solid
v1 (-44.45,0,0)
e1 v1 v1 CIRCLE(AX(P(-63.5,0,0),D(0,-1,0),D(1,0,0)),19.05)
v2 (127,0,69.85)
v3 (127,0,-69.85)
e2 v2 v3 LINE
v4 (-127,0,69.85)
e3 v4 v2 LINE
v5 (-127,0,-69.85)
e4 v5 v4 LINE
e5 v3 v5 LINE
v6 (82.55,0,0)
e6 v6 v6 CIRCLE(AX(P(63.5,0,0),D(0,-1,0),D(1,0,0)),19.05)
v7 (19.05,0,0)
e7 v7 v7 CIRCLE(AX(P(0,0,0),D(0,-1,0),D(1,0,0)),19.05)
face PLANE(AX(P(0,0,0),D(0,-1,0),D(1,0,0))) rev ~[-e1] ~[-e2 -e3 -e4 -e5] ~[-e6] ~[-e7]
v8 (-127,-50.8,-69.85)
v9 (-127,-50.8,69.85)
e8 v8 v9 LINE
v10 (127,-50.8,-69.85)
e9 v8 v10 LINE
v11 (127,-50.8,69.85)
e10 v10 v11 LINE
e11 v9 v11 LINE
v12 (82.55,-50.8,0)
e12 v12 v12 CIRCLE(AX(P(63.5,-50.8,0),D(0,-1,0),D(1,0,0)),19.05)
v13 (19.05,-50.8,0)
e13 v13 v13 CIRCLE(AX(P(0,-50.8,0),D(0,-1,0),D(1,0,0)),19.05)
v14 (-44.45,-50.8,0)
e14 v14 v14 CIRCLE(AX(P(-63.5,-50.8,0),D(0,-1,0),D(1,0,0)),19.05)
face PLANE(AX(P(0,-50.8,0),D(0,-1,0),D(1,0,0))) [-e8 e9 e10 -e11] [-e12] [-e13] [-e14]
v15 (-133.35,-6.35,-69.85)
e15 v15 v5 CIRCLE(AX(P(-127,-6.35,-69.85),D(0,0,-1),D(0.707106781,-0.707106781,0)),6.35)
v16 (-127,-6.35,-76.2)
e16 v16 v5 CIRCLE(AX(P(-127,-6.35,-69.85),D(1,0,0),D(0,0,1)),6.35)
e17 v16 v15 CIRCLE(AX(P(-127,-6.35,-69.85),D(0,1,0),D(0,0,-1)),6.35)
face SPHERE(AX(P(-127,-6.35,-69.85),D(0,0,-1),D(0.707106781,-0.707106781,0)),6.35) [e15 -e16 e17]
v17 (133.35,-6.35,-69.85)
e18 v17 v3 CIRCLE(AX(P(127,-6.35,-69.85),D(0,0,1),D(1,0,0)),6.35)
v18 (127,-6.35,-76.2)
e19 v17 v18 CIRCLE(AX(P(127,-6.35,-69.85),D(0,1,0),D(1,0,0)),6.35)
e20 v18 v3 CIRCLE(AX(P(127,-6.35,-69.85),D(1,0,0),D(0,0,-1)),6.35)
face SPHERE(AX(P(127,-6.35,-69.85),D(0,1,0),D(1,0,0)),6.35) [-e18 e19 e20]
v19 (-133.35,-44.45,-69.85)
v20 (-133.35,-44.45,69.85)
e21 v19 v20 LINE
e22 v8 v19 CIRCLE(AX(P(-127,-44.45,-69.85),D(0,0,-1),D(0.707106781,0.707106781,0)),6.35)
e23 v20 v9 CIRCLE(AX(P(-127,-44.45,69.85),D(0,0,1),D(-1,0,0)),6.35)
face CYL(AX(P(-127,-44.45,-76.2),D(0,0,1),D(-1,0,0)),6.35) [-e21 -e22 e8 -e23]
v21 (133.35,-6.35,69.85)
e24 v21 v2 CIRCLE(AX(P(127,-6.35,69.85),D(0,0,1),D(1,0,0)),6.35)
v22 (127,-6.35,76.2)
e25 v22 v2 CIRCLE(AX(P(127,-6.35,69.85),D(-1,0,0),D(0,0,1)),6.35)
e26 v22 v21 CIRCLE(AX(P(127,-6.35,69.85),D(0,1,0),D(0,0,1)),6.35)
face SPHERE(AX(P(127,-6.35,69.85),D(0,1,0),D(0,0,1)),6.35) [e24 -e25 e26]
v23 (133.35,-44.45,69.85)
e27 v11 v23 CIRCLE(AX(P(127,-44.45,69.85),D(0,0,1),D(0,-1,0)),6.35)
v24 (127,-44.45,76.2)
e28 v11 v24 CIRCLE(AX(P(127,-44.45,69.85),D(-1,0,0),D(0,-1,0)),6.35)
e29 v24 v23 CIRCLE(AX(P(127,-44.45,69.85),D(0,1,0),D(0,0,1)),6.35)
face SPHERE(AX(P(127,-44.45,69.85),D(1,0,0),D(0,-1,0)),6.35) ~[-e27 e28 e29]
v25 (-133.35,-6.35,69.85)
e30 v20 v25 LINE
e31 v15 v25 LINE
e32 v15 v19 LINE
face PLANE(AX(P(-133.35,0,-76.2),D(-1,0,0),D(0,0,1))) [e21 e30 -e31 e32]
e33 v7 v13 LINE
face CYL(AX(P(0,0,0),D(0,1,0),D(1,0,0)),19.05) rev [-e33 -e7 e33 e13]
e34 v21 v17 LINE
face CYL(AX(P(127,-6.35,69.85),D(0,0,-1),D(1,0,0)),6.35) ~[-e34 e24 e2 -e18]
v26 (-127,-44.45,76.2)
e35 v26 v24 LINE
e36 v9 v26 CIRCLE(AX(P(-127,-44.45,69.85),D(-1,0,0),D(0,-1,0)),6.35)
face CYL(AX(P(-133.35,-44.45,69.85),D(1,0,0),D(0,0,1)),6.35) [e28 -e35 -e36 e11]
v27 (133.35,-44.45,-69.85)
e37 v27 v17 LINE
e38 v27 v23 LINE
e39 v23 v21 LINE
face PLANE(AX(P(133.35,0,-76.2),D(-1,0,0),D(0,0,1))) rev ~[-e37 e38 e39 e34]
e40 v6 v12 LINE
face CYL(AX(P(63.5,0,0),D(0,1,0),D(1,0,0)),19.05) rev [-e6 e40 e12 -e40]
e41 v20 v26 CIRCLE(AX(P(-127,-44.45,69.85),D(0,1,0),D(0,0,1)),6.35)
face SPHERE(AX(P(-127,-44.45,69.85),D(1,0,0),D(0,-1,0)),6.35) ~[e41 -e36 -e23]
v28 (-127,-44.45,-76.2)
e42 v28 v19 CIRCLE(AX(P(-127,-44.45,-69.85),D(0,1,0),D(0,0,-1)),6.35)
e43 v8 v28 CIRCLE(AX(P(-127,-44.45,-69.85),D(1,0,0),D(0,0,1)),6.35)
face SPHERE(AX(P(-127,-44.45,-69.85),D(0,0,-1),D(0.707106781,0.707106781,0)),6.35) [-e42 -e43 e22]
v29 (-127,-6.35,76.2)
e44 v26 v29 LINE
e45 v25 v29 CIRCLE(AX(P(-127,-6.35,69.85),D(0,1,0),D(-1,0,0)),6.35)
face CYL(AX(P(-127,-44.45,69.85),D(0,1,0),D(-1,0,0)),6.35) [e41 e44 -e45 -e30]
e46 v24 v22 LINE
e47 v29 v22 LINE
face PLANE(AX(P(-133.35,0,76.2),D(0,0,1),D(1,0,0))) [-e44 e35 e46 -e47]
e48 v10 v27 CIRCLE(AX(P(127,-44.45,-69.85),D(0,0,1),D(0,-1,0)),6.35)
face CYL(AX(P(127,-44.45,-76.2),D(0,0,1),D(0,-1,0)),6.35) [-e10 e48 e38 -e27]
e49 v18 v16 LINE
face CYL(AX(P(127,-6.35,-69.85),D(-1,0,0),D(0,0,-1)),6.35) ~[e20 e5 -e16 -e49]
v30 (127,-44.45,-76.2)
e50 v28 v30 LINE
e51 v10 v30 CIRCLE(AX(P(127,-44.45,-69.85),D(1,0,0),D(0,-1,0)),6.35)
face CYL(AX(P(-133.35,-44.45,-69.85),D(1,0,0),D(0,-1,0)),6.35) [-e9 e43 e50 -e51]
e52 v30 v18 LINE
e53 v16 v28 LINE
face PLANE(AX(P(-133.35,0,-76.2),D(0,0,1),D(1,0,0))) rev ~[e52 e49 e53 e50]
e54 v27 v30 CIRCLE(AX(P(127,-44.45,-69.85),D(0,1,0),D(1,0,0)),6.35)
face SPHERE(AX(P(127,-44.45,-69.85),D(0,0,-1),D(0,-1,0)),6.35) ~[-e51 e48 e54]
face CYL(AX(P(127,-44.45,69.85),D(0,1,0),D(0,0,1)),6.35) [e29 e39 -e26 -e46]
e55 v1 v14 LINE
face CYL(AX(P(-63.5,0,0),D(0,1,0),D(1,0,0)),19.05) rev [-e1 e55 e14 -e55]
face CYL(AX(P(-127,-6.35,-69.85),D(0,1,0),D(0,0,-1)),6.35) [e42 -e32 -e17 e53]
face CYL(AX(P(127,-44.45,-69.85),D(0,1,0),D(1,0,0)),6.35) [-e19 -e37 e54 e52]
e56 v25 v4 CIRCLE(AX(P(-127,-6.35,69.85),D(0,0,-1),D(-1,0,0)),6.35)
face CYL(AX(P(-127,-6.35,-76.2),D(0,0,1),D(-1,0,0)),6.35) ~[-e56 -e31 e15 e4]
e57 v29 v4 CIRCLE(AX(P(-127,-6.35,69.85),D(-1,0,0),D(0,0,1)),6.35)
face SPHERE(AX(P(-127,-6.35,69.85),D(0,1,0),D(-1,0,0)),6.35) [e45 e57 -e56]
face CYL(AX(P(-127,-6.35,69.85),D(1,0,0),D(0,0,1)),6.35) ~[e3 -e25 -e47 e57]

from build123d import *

# Parameters (mm, degrees)
F0_W         = 266.7
F0_H         = 152.4
F0_R         = 19.05
F1_DEPTH     = 50.8
F2_R         = 6.35
F3_R         = 6.35
F4_R         = 6.35
F5_R         = 6.35
F6_T1_DEPTH  = 38.1
F6_S5_W      = 6.35
F6_S5_H      = 6.35
F6_T6_DEPTH  = 6.35
F6_S11_W     = 6.35
F6_S11_H     = 6.35
F6_T12_DEPTH = 6.35


# Not quite as in the source:
# - a fillet or chamfer that OpenCascade refuses, or shapes differently, is made with other operations: its cross-section is extruded or revolved along the edge and cut away or added


with BuildPart() as f1:
    # F0 (on Front) → F1 (new body)
    with BuildSketch(Plane.XZ):
        Rectangle(F0_W, F0_H)
        with Locations((-63.5, 0)):
            Circle(F0_R, mode=Mode.SUBTRACT)
        Circle(F0_R, mode=Mode.SUBTRACT)
        with Locations((63.5, 0)):
            Circle(F0_R, mode=Mode.SUBTRACT)
    extrude(amount=F1_DEPTH)

    # F2
    f2_edges = [f1.edges().sort_by_distance(p)[0] for p in [
        (0, -50.8, 76.2),
    ]]
    fillet(f2_edges, radius=F2_R)

    # F3
    f3_edges = [f1.edges().sort_by_distance(p)[0] for p in [
        (133.35, -50.8, -3.175),
    ]]
    fillet(f3_edges, radius=F3_R)

    # F4
    f4_edges = [f1.edges().sort_by_distance(p)[0] for p in [
        (-3.175, -50.8, -76.2),
        (-133.35, -50.8, -3.175),
    ]]
    fillet(f4_edges, radius=F4_R)

    # F5
    f5_edges = [f1.edges().sort_by_distance(p)[0] for p in [
        (0, 0, 76.2),
    ]]
    fillet(f5_edges, radius=F5_R)

    # F6: fillet of radius 6.35 on 1 edges, made by hand

    # F6_s2 → F6_t1 (cut)
    with BuildSketch(Plane.XZ.offset(6.35)):
        with BuildLine():
            ThreePointArc((-127, -76.2), (-131.4901280605, -74.3401280605), (-133.35, -69.85))
            Line((-133.35, -69.85), (-133.35, -76.2))
            Line((-133.35, -76.2), (-127, -76.2))
        make_face()
    extrude(amount=F6_T1_DEPTH, mode=Mode.SUBTRACT)


with BuildPart() as f6_tool4:
    # F6_s5 → F6_t6 (new body)
    with BuildSketch(Plane.XY.offset(-69.85)):
        with Locations((-130.175, -3.175)):
            Rectangle(F6_S5_W, F6_S5_H)
    extrude(amount=-F6_T6_DEPTH)

    # F6_s7 → F6_t8 (revolve, cut)
    with BuildSketch(Plane(origin=(-127, -6.35, -69.85), x_dir=(0.7071067812, -0.7071067812, 0), z_dir=(0.7071067812, 0.7071067812, 0))):
        with BuildLine():
            ThreePointArc((0, -6.35), (6.35, 0), (0, 6.35))
            Line((0, 6.35), (0, -6.35))
        make_face()
    revolve(axis=Axis((-127, -6.35, -69.85), (0, 0, -1)), mode=Mode.SUBTRACT)


with BuildPart() as f1_1:
    add(f1.part)

    # F6_t3: cut F6_tool4
    add(f6_tool4.part, mode=Mode.SUBTRACT)


with BuildPart() as f6_tool10:
    # F6_s11 → F6_t12 (new body)
    with BuildSketch(Plane.XY.offset(-69.85)):
        with Locations((-130.175, -47.625)):
            Rectangle(F6_S11_W, F6_S11_H)
    extrude(amount=-F6_T12_DEPTH)

    # F6_s13 → F6_t14 (revolve, cut)
    with BuildSketch(Plane(origin=(-127, -44.45, -69.85), x_dir=(0.7071067812, 0.7071067812, 0), z_dir=(-0.7071067812, 0.7071067812, 0))):
        with BuildLine():
            ThreePointArc((0, -6.35), (6.35, 0), (0, 6.35))
            Line((0, 6.35), (0, -6.35))
        make_face()
    revolve(axis=Axis((-127, -44.45, -69.85), (0, 0, -1)), mode=Mode.SUBTRACT)


with BuildPart() as f1_2:
    add(f1_1.part)

    # F6_t9: cut F6_tool10
    add(f6_tool10.part, mode=Mode.SUBTRACT)


solid = f1_2.part
